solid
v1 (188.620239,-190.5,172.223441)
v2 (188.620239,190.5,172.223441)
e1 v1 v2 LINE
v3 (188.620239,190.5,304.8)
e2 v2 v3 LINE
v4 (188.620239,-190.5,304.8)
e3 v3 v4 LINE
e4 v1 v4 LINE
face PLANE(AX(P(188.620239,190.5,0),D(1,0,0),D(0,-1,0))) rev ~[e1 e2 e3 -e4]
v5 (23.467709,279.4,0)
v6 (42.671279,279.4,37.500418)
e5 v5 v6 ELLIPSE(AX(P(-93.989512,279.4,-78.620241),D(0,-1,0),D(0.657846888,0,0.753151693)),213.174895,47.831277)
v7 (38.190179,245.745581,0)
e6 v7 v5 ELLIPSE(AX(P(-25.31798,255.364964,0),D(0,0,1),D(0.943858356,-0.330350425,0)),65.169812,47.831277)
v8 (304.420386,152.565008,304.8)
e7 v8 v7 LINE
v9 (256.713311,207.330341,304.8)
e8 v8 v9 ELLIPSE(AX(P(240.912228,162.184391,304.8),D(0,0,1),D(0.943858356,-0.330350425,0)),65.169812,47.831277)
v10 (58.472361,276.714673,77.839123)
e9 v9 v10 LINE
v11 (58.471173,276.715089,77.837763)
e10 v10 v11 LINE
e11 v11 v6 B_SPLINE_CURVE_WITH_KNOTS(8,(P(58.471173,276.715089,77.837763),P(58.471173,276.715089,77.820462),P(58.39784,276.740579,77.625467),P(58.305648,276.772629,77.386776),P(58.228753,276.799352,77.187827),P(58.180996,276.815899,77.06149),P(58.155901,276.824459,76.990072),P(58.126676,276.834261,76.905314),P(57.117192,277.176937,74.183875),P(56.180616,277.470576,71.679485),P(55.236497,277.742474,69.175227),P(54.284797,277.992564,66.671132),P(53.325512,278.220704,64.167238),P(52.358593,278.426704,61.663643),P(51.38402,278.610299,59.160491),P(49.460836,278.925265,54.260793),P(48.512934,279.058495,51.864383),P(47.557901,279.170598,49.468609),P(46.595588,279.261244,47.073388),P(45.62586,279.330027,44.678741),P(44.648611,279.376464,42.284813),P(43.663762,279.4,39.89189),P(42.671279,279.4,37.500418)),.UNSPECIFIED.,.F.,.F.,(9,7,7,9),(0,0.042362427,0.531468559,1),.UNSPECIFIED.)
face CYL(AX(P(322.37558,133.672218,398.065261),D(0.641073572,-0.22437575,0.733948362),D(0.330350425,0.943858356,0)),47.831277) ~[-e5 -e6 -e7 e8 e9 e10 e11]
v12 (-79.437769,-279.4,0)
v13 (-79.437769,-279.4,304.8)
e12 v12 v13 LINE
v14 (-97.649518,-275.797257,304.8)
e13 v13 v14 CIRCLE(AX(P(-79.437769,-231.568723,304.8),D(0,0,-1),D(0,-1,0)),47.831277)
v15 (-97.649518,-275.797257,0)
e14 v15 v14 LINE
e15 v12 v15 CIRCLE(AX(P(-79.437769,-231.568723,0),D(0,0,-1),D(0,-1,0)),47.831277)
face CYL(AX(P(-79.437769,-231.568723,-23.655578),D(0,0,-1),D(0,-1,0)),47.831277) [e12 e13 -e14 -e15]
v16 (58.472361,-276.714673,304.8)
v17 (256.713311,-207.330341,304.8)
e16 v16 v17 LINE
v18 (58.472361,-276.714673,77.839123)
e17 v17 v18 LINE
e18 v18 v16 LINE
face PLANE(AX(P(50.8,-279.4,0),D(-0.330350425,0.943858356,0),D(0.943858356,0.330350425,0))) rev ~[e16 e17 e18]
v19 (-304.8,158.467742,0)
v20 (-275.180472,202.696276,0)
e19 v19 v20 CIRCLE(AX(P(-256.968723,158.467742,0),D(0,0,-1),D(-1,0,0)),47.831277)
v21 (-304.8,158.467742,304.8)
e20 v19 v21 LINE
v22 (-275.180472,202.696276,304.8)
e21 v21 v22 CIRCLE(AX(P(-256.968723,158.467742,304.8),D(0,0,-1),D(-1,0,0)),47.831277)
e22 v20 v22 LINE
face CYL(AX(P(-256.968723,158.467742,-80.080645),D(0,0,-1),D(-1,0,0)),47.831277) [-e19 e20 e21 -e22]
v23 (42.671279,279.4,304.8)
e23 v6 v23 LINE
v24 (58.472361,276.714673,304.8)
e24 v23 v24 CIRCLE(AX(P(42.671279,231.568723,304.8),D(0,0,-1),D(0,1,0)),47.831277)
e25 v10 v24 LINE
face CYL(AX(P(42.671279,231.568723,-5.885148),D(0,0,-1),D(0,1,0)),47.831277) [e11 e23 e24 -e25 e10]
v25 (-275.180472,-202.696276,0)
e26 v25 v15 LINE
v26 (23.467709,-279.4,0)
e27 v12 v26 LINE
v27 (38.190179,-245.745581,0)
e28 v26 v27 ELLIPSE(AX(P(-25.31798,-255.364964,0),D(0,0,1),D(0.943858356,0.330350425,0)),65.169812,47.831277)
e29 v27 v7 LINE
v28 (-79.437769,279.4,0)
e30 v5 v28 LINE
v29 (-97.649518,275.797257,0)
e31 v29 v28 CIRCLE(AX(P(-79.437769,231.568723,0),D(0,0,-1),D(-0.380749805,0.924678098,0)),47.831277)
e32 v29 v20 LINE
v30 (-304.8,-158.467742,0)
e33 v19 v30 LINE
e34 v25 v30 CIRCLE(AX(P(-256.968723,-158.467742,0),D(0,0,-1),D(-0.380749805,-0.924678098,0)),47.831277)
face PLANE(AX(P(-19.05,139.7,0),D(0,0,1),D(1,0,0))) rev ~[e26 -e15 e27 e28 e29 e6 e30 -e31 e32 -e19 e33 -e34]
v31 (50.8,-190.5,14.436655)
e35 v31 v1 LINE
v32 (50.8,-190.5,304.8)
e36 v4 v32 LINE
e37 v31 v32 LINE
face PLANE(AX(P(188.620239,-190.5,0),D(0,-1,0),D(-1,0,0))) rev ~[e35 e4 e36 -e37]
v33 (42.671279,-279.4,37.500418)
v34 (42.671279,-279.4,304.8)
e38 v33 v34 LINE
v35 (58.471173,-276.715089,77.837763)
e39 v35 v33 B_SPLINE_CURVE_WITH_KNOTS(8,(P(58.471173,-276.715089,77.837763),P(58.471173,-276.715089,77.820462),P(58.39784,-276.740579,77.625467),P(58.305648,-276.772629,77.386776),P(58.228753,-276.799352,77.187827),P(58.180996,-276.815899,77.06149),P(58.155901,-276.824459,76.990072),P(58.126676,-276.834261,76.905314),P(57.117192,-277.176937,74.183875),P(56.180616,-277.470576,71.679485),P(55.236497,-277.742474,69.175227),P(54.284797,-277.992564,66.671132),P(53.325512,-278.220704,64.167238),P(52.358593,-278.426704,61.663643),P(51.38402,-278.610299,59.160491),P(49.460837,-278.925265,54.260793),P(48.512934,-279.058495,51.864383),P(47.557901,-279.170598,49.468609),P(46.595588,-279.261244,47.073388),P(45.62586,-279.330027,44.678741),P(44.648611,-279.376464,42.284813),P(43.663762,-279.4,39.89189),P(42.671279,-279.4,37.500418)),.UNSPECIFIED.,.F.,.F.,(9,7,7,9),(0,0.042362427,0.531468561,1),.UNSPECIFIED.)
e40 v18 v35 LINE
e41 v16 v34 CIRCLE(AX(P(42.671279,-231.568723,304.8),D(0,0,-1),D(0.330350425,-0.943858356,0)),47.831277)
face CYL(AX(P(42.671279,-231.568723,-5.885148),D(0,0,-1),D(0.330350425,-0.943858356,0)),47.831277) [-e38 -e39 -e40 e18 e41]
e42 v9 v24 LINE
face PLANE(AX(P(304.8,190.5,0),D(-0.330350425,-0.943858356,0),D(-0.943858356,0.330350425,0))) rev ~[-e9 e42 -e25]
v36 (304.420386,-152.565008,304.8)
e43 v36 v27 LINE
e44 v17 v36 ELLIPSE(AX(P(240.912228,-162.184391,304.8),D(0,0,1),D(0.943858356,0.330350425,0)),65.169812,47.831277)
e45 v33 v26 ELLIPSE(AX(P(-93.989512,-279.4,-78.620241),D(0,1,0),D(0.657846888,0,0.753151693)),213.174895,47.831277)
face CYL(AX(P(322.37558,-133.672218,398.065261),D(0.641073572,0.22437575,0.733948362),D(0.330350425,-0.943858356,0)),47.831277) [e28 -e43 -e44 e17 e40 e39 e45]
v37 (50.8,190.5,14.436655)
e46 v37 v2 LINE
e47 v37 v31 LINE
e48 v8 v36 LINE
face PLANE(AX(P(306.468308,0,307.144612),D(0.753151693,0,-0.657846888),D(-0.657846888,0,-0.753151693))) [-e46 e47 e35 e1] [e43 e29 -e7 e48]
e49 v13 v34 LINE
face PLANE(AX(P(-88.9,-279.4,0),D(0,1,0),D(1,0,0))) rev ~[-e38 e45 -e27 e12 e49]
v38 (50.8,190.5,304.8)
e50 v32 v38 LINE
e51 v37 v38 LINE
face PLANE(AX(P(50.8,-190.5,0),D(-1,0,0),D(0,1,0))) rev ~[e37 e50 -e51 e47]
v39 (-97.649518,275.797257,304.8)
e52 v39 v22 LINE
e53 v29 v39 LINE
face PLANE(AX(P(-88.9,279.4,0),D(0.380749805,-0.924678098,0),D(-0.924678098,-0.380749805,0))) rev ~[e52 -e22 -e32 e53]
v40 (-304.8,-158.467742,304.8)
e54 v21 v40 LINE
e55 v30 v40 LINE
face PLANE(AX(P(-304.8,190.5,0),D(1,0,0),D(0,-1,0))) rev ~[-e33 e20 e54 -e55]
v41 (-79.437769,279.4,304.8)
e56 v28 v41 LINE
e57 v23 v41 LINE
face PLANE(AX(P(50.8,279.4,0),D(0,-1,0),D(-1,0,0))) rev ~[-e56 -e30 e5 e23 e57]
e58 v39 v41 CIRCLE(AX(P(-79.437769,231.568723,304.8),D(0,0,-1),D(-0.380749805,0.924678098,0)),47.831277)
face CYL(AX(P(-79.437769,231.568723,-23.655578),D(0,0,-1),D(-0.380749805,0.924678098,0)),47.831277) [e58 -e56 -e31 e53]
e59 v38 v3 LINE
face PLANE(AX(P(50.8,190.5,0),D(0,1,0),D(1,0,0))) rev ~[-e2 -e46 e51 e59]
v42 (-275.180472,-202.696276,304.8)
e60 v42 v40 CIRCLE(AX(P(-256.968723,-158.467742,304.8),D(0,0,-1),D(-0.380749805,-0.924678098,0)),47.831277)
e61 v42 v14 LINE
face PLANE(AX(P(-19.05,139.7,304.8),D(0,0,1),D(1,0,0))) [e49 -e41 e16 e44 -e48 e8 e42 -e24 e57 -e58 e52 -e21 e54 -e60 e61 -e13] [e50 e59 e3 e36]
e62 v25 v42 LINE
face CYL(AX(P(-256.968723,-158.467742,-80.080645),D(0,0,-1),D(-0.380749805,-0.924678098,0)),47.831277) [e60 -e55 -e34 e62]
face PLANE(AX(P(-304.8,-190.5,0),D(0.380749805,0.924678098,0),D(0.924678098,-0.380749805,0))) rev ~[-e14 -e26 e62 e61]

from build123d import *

# Parameters (mm, degrees)
F0_W        = 116.1797607577
F0_H        = 190.5
F1_DEPTH    = 304.8
F3_DEPTH    = 401.32
F4_DEPTH    = 942.34
F5_T1_DEPTH = 331.0069513468
F5_T3_DEPTH = 352.1111565483
F5_T5_DEPTH = 464.9612906349
F5_T7_DEPTH = 766.5905156751
F5_T9_DEPTH = 766.5905156751


# Not quite as in the source:
# - a fillet or chamfer that OpenCascade refuses, or shapes differently, is made with other operations: its cross-section is extruded or revolved along the edge and cut away or added


with BuildPart() as f1:
    # F0 (on Top) → F1 (new body)
    with BuildSketch(Plane.XY):
        Polygon((50.8, 190.5), (50.8, 279.4), (-88.9, 279.4), (-88.9, 190.5), (-88.9, 0), (0, 0), (50.8, 0), align=None)
        Polygon((188.6202392423, 231.1629162652), (50.8, 279.4), (50.8, 190.5), (188.6202392423, 190.5), align=None)
        Polygon((-88.9, 190.5), (-88.9, 279.4), (-304.8, 190.5), (-304.8, 0), (-188.6202392423, 0), (-88.9, 0), align=None)
        Polygon((304.8, 190.5), (188.6202392423, 231.1629162652), (188.6202392423, 190.5), align=None)
        with Locations((246.7101196212, 95.25)):
            Rectangle(F0_W, F0_H)
        Polygon((50.8, -190.5), (50.8, 0), (0, 0), (-88.9, 0), (-88.9, -190.5), (-88.9, -279.4), (50.8, -279.4), align=None)
        Polygon((-88.9, -190.5), (-88.9, 0), (-188.6202392423, 0), (-304.8, 0), (-304.8, -190.5), (-88.9, -279.4), align=None)
        with Locations((246.7101196212, -95.25)):
            Rectangle(F0_W, F0_H)
        Polygon((188.6202392423, -190.5), (50.8, -190.5), (50.8, -279.4), (188.6202392423, -231.1629162652), align=None)
        Polygon((304.8, -190.5), (188.6202392423, -190.5), (188.6202392423, -231.1629162652), align=None)
    extrude(amount=F1_DEPTH)

    # F2 (on Front) → F3 (cut)
    with BuildSketch(Plane.XZ):
        Polygon((306.468307972, 307.1446120739), (38.1901785731, 0), (-147.3951488733, -79.8071026802), (42.6088683307, 0), (5.996810738, -19.8390558362), (306.468307972, -19.8390558362), align=None)
    extrude(amount=-F3_DEPTH, mode=Mode.SUBTRACT)

    # F2 (on Front) → F4 (cut)
    with BuildSketch(Plane.XZ):
        Polygon((306.468307972, 307.1446120739), (38.1901785731, 0), (-147.3951488733, -79.8071026802), (42.6088683307, 0), (5.996810738, -19.8390558362), (306.468307972, -19.8390558362), align=None)
    extrude(amount=F4_DEPTH, mode=Mode.SUBTRACT)

    # F5: fillet of radius 47.8312768991 on 8 edges, made by hand

    # F5_s2 → F5_t1 (cut)
    with BuildSketch(Plane.XY.offset(-5.8851483368)):
        with BuildLine():
            ThreePointArc((42.671278796, 279.4), (50.6850979696, 278.7238898597), (58.4723614349, 276.7146734978))
            Line((58.4723614349, 276.7146734978), (50.8, 279.4))
            Line((50.8, 279.4), (42.671278796, 279.4))
        make_face()
        with BuildLine():
            ThreePointArc((58.4723614349, -276.7146734978), (50.6850979696, -278.7238898597), (42.671278796, -279.4))
            Line((42.671278796, -279.4), (50.8, -279.4))
            Line((50.8, -279.4), (58.4723614349, -276.7146734978))
        make_face()
    extrude(amount=F5_T1_DEPTH, mode=Mode.SUBTRACT)

    # F5_s4 → F5_t3 (cut)
    with BuildSketch(Plane.XY.offset(-23.6555782741)):
        with BuildLine():
            ThreePointArc((-97.6495180547, 275.7972572716), (-88.7201117415, 278.4906706018), (-79.4377686903, 279.4))
            Line((-79.4377686903, 279.4), (-88.9, 279.4))
            Line((-88.9, 279.4), (-97.6495180547, 275.7972572716))
        make_face()
        with BuildLine():
            ThreePointArc((-79.4377686903, -279.4), (-88.7201117415, -278.4906706018), (-97.6495180547, -275.7972572716))
            Line((-97.6495180547, -275.7972572716), (-88.9, -279.4))
            Line((-88.9, -279.4), (-79.4377686903, -279.4))
        make_face()
    extrude(amount=F5_T3_DEPTH, mode=Mode.SUBTRACT)

    # F5_s6 → F5_t5 (cut)
    with BuildSketch(Plane.XY.offset(-80.0806453175)):
        with BuildLine():
            ThreePointArc((-304.8, 158.467741873), (-296.7111580821, 185.0829614206), (-275.1804724653, 202.6962760437))
            Line((-275.1804724653, 202.6962760437), (-304.8, 190.5))
            Line((-304.8, 190.5), (-304.8, 158.467741873))
        make_face()
        with BuildLine():
            ThreePointArc((-275.1804724653, -202.6962760437), (-296.7111580821, -185.0829614206), (-304.8, -158.467741873))
            Line((-304.8, -158.467741873), (-304.8, -190.5))
            Line((-304.8, -190.5), (-275.1804724653, -202.6962760437))
        make_face()
    extrude(amount=F5_T5_DEPTH, mode=Mode.SUBTRACT)

    # F5_s8 → F5_t7 (cut)
    with BuildSketch(Plane(origin=(300.5564502803, -105.1947575981, 344.0992172359), x_dir=(-0.3303504247, -0.9438583564, 0), z_dir=(-0.6410735721, 0.2243757502, -0.7339483619))):
        with BuildLine():
            ThreePointArc((-280.4958263449, 79.454688834), (-270.4603992444, 50.1407879029), (-244.5651615788, 33.1275209877))
            Line((-244.5651615788, 33.1275209877), (-280.4958263449, 42.357459379))
            Line((-280.4958263449, 42.357459379), (-280.4958263449, 79.454688834))
        make_face()
    extrude(amount=F5_T7_DEPTH, mode=Mode.SUBTRACT)

    # F5_s10 → F5_t9 (cut)
    with BuildSketch(Plane(origin=(300.5564502803, 105.1947575981, 344.0992172359), x_dir=(0.3303504247, -0.9438583564, 0), z_dir=(-0.6410735721, -0.2243757502, -0.7339483619))):
        with BuildLine():
            ThreePointArc((280.4958263449, 79.454688834), (270.4603992444, 50.1407879029), (244.5651615788, 33.1275209877))
            Line((244.5651615788, 33.1275209877), (280.4958263449, 42.357459379))
            Line((280.4958263449, 42.357459379), (280.4958263449, 79.454688834))
        make_face()
    extrude(amount=F5_T9_DEPTH, mode=Mode.SUBTRACT)


solid = f1.part
